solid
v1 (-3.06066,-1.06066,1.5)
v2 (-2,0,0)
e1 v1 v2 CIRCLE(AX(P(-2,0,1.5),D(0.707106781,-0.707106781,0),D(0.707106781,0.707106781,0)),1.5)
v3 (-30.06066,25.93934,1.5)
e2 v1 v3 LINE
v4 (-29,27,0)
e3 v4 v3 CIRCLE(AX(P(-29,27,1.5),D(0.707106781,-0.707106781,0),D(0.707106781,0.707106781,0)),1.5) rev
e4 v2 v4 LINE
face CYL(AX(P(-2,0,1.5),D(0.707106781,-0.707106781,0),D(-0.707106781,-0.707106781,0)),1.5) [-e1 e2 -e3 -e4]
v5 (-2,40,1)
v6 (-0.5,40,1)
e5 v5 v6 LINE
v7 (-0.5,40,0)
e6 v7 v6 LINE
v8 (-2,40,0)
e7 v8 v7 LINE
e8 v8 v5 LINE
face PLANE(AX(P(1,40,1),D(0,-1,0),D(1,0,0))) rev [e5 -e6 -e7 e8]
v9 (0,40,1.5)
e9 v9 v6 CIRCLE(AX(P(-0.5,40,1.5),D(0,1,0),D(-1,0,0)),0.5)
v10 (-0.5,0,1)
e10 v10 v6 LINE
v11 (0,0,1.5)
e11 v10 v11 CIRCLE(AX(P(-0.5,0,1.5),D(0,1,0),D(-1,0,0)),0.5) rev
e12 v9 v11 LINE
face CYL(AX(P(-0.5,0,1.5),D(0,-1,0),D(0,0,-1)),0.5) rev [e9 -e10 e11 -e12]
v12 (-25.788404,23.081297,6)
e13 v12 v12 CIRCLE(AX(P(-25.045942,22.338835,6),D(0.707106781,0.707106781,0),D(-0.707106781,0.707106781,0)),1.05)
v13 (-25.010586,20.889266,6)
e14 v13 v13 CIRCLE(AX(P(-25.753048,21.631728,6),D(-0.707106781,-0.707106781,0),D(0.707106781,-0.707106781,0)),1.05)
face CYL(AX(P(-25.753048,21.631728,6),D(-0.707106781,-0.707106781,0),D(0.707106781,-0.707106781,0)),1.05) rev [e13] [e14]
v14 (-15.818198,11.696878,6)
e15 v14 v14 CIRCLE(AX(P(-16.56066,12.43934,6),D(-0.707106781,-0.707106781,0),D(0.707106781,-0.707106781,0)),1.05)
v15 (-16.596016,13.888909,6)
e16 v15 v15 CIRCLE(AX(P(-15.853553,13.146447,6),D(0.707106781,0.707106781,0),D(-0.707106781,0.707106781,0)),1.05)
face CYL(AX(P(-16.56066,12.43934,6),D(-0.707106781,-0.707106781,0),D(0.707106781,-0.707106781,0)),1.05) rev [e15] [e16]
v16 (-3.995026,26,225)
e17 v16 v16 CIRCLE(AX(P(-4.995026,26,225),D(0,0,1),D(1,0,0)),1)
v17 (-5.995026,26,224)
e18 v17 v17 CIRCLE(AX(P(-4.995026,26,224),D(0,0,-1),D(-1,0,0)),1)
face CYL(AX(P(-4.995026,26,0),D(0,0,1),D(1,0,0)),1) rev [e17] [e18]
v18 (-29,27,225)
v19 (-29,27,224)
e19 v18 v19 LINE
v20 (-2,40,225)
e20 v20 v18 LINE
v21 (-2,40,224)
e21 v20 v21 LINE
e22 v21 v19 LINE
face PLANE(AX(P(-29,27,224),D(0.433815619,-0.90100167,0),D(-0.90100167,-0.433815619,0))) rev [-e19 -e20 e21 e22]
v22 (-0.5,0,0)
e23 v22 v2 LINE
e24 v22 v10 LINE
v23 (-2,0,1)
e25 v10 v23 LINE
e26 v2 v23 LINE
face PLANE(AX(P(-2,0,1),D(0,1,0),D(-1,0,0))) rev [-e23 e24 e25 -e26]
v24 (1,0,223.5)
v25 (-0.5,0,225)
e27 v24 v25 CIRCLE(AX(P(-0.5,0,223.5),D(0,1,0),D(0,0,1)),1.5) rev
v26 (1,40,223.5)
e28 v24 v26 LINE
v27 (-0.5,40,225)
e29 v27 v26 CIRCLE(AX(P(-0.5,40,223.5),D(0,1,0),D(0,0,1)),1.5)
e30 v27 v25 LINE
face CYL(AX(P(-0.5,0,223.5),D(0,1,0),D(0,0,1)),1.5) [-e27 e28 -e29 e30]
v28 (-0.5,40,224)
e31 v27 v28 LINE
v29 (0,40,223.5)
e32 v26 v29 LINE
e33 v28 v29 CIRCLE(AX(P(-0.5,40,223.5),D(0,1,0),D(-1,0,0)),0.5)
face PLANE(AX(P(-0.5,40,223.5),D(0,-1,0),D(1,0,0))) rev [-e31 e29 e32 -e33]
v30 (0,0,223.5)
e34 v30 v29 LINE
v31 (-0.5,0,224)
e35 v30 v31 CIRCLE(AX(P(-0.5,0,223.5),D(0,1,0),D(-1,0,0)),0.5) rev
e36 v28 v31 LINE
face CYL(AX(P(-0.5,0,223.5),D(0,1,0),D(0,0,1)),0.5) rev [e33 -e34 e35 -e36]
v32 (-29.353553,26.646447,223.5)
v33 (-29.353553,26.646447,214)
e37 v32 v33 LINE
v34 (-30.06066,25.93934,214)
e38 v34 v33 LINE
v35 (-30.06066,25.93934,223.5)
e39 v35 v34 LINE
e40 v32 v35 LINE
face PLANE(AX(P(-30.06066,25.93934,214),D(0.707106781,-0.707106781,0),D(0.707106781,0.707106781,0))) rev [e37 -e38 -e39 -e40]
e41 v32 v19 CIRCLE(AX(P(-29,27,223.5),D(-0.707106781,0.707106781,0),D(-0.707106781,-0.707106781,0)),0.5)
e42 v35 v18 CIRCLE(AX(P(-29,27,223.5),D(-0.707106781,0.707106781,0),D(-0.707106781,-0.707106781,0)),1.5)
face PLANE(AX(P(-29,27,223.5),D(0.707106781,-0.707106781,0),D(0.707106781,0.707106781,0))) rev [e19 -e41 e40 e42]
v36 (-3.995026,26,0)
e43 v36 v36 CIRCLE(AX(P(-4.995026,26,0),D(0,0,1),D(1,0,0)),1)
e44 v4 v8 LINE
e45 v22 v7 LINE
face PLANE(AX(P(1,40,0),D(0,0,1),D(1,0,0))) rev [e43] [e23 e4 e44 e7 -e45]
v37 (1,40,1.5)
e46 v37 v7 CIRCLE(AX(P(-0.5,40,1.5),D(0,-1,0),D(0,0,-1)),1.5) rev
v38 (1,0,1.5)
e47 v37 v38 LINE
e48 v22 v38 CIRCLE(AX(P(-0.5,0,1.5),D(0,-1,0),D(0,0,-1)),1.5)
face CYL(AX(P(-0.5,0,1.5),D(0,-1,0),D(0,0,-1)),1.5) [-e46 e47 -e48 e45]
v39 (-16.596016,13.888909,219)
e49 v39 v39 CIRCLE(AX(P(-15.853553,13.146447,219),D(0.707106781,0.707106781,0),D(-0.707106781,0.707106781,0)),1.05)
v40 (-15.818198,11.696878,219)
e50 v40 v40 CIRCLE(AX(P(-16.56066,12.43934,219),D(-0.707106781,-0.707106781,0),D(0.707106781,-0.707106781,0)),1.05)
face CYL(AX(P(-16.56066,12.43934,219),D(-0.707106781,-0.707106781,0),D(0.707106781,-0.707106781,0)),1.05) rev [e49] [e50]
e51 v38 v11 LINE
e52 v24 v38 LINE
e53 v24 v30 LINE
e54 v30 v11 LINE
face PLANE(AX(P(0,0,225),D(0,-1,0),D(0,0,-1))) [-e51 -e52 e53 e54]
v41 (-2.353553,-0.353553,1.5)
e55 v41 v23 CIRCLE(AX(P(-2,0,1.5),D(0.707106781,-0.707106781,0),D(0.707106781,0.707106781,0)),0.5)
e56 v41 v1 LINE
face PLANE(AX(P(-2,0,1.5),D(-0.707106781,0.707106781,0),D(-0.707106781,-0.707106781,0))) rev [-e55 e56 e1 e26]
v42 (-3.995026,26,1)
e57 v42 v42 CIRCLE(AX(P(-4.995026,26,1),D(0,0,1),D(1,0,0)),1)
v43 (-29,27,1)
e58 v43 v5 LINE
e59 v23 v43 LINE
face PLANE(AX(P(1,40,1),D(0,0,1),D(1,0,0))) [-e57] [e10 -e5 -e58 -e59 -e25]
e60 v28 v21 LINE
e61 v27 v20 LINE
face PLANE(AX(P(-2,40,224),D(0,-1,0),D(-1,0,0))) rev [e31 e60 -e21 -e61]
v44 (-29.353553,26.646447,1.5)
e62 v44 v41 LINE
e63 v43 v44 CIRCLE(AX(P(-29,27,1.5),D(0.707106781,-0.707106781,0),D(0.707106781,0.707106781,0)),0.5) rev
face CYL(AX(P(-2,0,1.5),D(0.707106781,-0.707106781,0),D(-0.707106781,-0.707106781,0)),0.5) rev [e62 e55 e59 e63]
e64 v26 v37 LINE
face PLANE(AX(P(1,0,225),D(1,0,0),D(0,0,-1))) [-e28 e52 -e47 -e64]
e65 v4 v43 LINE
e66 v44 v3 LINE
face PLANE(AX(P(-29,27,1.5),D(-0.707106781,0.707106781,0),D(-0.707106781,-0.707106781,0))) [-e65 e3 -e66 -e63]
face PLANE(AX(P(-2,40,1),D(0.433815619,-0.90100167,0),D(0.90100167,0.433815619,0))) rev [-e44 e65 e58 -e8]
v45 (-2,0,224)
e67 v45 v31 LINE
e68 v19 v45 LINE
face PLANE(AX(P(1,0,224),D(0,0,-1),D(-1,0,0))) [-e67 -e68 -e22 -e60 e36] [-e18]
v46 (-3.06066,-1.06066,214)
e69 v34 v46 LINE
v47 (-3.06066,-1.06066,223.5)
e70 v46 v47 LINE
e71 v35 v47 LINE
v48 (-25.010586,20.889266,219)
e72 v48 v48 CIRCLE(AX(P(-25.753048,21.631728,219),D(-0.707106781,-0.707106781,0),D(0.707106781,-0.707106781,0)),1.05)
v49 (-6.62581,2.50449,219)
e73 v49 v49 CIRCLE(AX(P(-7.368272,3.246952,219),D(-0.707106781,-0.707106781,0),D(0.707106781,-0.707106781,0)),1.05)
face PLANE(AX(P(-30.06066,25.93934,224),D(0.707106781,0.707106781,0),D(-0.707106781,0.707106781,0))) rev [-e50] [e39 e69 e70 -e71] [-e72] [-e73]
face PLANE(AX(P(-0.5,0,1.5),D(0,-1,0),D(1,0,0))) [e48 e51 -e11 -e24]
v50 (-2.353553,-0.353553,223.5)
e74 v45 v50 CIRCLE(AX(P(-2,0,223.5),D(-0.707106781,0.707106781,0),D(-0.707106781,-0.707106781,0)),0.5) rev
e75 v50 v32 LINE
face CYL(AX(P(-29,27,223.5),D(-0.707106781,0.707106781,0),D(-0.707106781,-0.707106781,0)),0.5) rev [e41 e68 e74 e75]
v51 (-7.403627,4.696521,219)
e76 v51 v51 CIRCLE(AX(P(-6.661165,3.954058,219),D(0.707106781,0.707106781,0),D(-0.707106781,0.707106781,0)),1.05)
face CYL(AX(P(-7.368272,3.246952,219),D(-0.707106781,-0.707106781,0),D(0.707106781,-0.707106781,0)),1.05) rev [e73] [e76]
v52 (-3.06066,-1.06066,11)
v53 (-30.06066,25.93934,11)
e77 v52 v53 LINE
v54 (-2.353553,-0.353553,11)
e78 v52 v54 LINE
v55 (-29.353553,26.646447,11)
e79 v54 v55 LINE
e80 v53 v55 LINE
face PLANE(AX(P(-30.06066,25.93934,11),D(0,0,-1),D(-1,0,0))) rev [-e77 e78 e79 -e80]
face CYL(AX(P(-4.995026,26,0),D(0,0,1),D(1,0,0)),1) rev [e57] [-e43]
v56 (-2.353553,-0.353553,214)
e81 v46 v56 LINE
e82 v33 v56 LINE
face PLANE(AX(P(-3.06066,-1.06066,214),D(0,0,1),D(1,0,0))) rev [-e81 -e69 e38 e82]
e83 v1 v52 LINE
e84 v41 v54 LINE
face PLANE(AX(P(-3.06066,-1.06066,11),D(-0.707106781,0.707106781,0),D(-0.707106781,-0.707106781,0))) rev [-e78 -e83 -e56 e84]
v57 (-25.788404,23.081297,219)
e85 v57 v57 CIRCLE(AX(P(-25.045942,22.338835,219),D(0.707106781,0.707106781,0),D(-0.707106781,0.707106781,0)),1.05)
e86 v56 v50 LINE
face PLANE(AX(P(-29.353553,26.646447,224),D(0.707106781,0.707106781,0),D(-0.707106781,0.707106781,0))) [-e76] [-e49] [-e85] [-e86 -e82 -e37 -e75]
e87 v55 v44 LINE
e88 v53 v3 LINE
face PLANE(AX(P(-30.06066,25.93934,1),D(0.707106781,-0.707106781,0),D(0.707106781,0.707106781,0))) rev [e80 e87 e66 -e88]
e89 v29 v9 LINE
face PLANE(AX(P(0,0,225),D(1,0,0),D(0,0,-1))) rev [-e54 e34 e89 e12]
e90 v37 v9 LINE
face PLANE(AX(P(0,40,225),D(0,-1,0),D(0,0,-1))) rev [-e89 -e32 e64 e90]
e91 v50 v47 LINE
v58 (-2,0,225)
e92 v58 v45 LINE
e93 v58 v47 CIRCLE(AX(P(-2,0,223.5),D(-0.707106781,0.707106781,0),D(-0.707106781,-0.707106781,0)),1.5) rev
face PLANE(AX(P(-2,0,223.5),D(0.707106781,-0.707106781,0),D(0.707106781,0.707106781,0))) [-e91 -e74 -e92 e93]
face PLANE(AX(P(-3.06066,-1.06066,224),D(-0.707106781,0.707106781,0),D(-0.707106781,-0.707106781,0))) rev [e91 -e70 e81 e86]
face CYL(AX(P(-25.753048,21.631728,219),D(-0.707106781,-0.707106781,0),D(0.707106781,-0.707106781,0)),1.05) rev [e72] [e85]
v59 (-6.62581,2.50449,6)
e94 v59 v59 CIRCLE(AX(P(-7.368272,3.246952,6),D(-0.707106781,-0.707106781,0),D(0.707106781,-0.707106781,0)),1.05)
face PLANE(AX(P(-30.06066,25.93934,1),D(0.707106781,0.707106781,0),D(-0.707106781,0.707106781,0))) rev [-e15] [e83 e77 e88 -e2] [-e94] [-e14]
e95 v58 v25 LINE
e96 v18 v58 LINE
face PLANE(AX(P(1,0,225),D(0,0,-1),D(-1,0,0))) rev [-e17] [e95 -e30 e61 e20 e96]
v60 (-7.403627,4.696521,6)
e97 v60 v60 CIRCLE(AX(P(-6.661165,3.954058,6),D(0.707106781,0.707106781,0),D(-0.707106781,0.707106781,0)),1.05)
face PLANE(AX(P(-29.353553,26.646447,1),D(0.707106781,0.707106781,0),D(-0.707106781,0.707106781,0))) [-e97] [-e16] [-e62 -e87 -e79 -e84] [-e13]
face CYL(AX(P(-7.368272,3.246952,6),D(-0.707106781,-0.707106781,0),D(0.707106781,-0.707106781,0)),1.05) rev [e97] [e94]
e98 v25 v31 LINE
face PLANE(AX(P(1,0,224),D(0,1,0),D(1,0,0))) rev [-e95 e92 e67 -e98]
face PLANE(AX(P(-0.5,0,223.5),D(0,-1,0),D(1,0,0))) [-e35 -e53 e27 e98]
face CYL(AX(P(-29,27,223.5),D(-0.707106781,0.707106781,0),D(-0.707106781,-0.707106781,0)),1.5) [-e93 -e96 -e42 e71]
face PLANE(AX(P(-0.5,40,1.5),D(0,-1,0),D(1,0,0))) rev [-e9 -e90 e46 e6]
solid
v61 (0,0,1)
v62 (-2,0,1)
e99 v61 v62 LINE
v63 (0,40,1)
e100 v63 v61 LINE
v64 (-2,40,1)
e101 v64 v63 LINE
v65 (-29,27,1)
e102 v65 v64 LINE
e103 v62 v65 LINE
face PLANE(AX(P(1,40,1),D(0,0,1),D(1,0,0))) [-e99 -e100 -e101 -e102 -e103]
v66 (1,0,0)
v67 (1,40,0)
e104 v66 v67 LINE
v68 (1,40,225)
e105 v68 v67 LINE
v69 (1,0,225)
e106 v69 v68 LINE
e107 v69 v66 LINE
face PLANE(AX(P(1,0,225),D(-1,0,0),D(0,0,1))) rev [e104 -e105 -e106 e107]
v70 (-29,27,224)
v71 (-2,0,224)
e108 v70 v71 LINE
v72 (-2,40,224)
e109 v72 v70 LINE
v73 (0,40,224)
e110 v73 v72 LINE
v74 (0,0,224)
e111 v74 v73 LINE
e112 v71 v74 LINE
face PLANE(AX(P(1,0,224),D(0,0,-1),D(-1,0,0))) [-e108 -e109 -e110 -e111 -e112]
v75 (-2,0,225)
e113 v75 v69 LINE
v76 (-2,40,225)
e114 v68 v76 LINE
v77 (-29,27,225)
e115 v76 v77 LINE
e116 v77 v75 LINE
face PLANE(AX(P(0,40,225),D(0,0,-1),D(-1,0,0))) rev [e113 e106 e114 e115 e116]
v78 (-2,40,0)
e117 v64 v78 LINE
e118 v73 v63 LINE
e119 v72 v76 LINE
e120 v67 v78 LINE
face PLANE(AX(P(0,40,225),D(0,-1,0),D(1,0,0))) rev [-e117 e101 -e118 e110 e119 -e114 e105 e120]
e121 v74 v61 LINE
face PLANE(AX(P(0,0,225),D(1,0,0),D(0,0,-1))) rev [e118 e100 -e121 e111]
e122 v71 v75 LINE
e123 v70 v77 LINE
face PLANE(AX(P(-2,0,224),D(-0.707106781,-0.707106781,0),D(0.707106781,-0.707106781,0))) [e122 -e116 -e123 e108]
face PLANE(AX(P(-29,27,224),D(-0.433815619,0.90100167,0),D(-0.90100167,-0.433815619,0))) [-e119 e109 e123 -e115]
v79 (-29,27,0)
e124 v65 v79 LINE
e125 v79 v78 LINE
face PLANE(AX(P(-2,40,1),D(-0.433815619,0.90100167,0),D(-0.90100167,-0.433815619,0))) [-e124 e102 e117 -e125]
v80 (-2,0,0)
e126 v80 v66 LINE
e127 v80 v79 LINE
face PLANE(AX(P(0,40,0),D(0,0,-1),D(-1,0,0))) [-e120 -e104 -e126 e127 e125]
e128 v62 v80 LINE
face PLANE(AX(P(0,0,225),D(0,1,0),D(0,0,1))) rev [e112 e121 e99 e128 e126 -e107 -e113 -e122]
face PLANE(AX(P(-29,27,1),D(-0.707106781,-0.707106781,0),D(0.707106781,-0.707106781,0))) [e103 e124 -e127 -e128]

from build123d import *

# Parameters (mm, degrees)
SKETCH_1_W                       = 1
SKETCH_1_H                       = 40
EXTRUDE_1_DEPTH                  = 225
EXTRUDE_2_DEPTH                  = 1
EXTRUDE_3_DEPTH                  = 1
SHEET_METAL_1_OUTLINE_W          = 1
SHEET_METAL_1_OUTLINE_H          = 40
SHEET_METAL_1_DEPTH              = 225
SHEET_METAL_1_2_DEPTH            = 1.5
SHEET_START                      = 223.5
SHEET_METAL_1_3_DEPTH            = 1.5
SHEET_START_2                    = -1
SHEET_METAL_1_4_DEPTH            = 42
SM_EDGE_FLANGE_1_DEPTH           = 38.183766184
SM_EDGE_FLANGE_2_DEPTH           = 38.183766184
SKETCH_15_R                      = 1
CUT_EXTRUDE_1_DEPTH              = 231.496514702
HOLE_WIZARD_2_1_2_1_1_AT_2_COUNT = 2
HOLE_WIZARD_2_1_2_1_1_AT_2_PITCH = 13
HOLE_WIZARD_2_1_2_1_1_AT_3_COUNT = 2
HOLE_WIZARD_2_1_2_1_1_AT_3_PITCH = 26
HOLE_WIZARD_2_1_2_1_1_AT_4_COUNT = 2
HOLE_WIZARD_2_1_2_1_1_AT_4_PITCH = 213
HOLE_WIZARD_2_1_2_1_1_AT_5_COUNT = 2
HOLE_WIZARD_2_1_2_1_1_AT_5_PITCH = 213.396344861
HOLE_WIZARD_2_1_2_1_1_AT_6_COUNT = 2
HOLE_WIZARD_2_1_2_1_1_AT_6_PITCH = 214.580987042


with BuildPart() as part:
    # Sketch 1 → Бобышка-Вытянуть1 (new body)
    with BuildSketch(Plane.XY):
        with Locations((0.5, 20)):
            Rectangle(SKETCH_1_W, SKETCH_1_H)
    extrude(amount=EXTRUDE_1_DEPTH)

    # Эскиз2 → Бобышка-Вытянуть2 (add)
    with BuildSketch(Plane.XY.offset(225)):
        Polygon((1, 0), (-2, 0), (-29, 27), (-2, 40), (1, 40), align=None)
    extrude(amount=-EXTRUDE_2_DEPTH)

    # Эскиз4 → Бобышка-Вытянуть3 (add)
    with BuildSketch(Plane(origin=(0, 0, 0), x_dir=(-1, 0, 0), z_dir=(0, 0, -1))):
        Polygon((-1, 40), (2, 40), (29, 27), (2, 0), (-1, 0), align=None)
    extrude(amount=-EXTRUDE_3_DEPTH)


with BuildPart() as body_2:
    # Sheet Metal 1: read off the stored shape, not the designer's step
    # Sheet Metal 1 outline → Sheet Metal 1 (new body)
    with BuildSketch(Plane.XY):
        with Locations((0.5, 20)):
            Rectangle(SHEET_METAL_1_OUTLINE_W, SHEET_METAL_1_OUTLINE_H)
    extrude(amount=SHEET_METAL_1_DEPTH)

    # Sheet Metal 1 2 outline → Sheet Metal 1 2 (add)
    with BuildSketch(Plane.XY):
        Polygon((0, 0), (0, 40), (-2, 40), (-29, 27), (-2, 0), align=None)
    extrude(amount=SHEET_METAL_1_2_DEPTH)

    # Sheet Metal 1 3 outline → Sheet Metal 1 3 (add)
    with BuildSketch(Plane.XY.offset(SHEET_START)):
        Polygon((0, 0), (0, 40), (-2, 40), (-29, 27), (-2, 0), align=None)
    extrude(amount=SHEET_METAL_1_3_DEPTH)

    # Sheet Metal 1 4 outline → Sheet Metal 1 4 (cut)
    with BuildSketch(Plane(origin=(0, 0, 0), x_dir=(1, 0, 0), z_dir=(0, 1, 0)).offset(SHEET_START_2)):
        with BuildLine():
            Line((-31, -224), (-0.5, -224))
            ThreePointArc((-0.5, -224), (-0.146446609, -223.853553391), (0, -223.5))
            Line((0, -223.5), (-31, -223.5))
            Line((-31, -223.5), (-31, -224))
        make_face()
        with BuildLine():
            Line((-0.5, -225), (-31, -224.999999985))
            Line((-31, -224.999999985), (-31, -226))
            Line((-31, -226), (0.999999887, -226))
            Line((0.999999887, -226), (1, -223.5))
            ThreePointArc((1, -223.5), (0.560660172, -224.560660172), (-0.5, -225))
        make_face()
        with BuildLine():
            Line((-31, -1), (-31, -1.5))
            Line((-31, -1.5), (0, -1.5))
            ThreePointArc((0, -1.5), (-0.146446609, -1.146446609), (-0.5, -1))
            Line((-0.5, -1), (-31, -1))
        make_face()
        with BuildLine():
            Line((-31, 1), (-31, -1.5e-08))
            Line((-31, -1.5e-08), (-0.5, 0))
            ThreePointArc((-0.5, 0), (0.560660172, -0.439339828), (1, -1.5))
            Line((1, -1.5), (0.999999887, 1))
            Line((0.999999887, 1), (-31, 1))
        make_face()
    extrude(amount=SHEET_METAL_1_4_DEPTH, mode=Mode.SUBTRACT)

    # Ребро-кромка1: sheet metal written as solids
    # Ребро-кромка1 section (on a plane across the edge) → Ребро-кромка1 (add)
    with BuildSketch(Plane(origin=(-2.353553391, -0.353553391, 224), x_dir=(0.7071067811865476, 0.7071067811865475, -3.4914813388431334e-15), z_dir=(-0.7071067811865475, 0.7071067811865476, 0))):
        with BuildLine():
            Line((-1, 0.5), (-1, 10))
            Line((-1, 10), (0, 10))
            Line((0, 10), (0, 0.5))
            ThreePointArc((0, 0.5), (0.146446609, 0.146446609), (0.5, 0))
            Line((0.5, 0), (0.5, -1))
            ThreePointArc((0.5, -1), (-0.560660172, -0.560660172), (-1, 0.5))
        make_face()
    extrude(amount=SM_EDGE_FLANGE_1_DEPTH)

    # Ребро-кромка2: sheet metal written as solids
    # Ребро-кромка2 section (on a plane across the edge) → Ребро-кромка2 (add)
    with BuildSketch(Plane(origin=(-29.353553391, 26.646446609, 1), x_dir=(0.7071067811865476, 0.7071067811865475, 3.4914813388431334e-15), z_dir=(0.7071067811865475, -0.7071067811865476, 0))):
        with BuildLine():
            Line((-1, 0.5), (-1, 10))
            Line((-1, 10), (0, 10))
            Line((0, 10), (0, 0.5))
            ThreePointArc((0, 0.5), (0.146446609, 0.146446609), (0.5, 0))
            Line((0.5, 0), (0.5, -1))
            ThreePointArc((0.5, -1), (-0.560660172, -0.560660172), (-1, 0.5))
        make_face()
    extrude(amount=SM_EDGE_FLANGE_2_DEPTH)

    # Эскиз15 → Вырез-Вытянуть1 (cut, through all)
    with BuildSketch(Plane.XY.offset(225)):
        with Locations((-4.995026007, 26)):
            Circle(SKETCH_15_R)
    extrude(amount=-CUT_EXTRUDE_1_DEPTH, mode=Mode.SUBTRACT)

    # Эскиз16 → Диаметр отверстия Ø2.1 (2.1)1 (revolve, cut)
    with BuildSketch(Plane(origin=(-25.753048327, 21.631727984, 219), x_dir=(0.7071067811865475, -0.7071067811865477, 0), z_dir=(0, 0, 1))):
        Polygon((0, 0), (0, 5.63090365), (1.05, 5), (1.05, 0), align=None)
    hole_wizard_2_1_2_1_1 = revolve(axis=Axis((-30.243176388, 17.141599923, 219), (0.7071067811865476, 0.7071067811865474, -3.4812242521929712e-15)), mode=Mode.SUBTRACT)

    # Диаметр отверстия Ø2.1 (2.1)1 at 2: Диаметр отверстия Ø2.1 (2.1)1 ×2
    with Locations(*[Vector(0.7071067811865476, -0.7071067811865476, 3.886729494756105e-15) * (i * HOLE_WIZARD_2_1_2_1_1_AT_2_PITCH) for i in range(1, HOLE_WIZARD_2_1_2_1_1_AT_2_COUNT)]):
        add(hole_wizard_2_1_2_1_1, mode=Mode.SUBTRACT)

    # Диаметр отверстия Ø2.1 (2.1)1 at 3: Диаметр отверстия Ø2.1 (2.1)1 ×2
    with Locations(*[Vector(0.7071067811865476, -0.7071067811865476, 3.0365074177782066e-15) * (i * HOLE_WIZARD_2_1_2_1_1_AT_3_PITCH) for i in range(1, HOLE_WIZARD_2_1_2_1_1_AT_3_COUNT)]):
        add(hole_wizard_2_1_2_1_1, mode=Mode.SUBTRACT)

    # Диаметр отверстия Ø2.1 (2.1)1 at 4: Диаметр отверстия Ø2.1 (2.1)1 ×2
    with Locations(*[(0, 0, -i * HOLE_WIZARD_2_1_2_1_1_AT_4_PITCH) for i in range(1, HOLE_WIZARD_2_1_2_1_1_AT_4_COUNT)]):
        add(hole_wizard_2_1_2_1_1, mode=Mode.SUBTRACT)

    # Диаметр отверстия Ø2.1 (2.1)1 at 5: Диаметр отверстия Ø2.1 (2.1)1 ×2
    with Locations(*[Vector(0.04307659609360352, -0.04307659609360844, -0.9981426820540121) * (i * HOLE_WIZARD_2_1_2_1_1_AT_5_PITCH) for i in range(1, HOLE_WIZARD_2_1_2_1_1_AT_5_COUNT)]):
        add(hole_wizard_2_1_2_1_1, mode=Mode.SUBTRACT)

    # Диаметр отверстия Ø2.1 (2.1)1 at 6: Диаметр отверстия Ø2.1 (2.1)1 ×2
    with Locations(*[Vector(0.085677564281292, -0.0856775642812969, -0.9926322128349702) * (i * HOLE_WIZARD_2_1_2_1_1_AT_6_PITCH) for i in range(1, HOLE_WIZARD_2_1_2_1_1_AT_6_COUNT)]):
        add(hole_wizard_2_1_2_1_1, mode=Mode.SUBTRACT)


solid = Compound([part.part, body_2.part])
